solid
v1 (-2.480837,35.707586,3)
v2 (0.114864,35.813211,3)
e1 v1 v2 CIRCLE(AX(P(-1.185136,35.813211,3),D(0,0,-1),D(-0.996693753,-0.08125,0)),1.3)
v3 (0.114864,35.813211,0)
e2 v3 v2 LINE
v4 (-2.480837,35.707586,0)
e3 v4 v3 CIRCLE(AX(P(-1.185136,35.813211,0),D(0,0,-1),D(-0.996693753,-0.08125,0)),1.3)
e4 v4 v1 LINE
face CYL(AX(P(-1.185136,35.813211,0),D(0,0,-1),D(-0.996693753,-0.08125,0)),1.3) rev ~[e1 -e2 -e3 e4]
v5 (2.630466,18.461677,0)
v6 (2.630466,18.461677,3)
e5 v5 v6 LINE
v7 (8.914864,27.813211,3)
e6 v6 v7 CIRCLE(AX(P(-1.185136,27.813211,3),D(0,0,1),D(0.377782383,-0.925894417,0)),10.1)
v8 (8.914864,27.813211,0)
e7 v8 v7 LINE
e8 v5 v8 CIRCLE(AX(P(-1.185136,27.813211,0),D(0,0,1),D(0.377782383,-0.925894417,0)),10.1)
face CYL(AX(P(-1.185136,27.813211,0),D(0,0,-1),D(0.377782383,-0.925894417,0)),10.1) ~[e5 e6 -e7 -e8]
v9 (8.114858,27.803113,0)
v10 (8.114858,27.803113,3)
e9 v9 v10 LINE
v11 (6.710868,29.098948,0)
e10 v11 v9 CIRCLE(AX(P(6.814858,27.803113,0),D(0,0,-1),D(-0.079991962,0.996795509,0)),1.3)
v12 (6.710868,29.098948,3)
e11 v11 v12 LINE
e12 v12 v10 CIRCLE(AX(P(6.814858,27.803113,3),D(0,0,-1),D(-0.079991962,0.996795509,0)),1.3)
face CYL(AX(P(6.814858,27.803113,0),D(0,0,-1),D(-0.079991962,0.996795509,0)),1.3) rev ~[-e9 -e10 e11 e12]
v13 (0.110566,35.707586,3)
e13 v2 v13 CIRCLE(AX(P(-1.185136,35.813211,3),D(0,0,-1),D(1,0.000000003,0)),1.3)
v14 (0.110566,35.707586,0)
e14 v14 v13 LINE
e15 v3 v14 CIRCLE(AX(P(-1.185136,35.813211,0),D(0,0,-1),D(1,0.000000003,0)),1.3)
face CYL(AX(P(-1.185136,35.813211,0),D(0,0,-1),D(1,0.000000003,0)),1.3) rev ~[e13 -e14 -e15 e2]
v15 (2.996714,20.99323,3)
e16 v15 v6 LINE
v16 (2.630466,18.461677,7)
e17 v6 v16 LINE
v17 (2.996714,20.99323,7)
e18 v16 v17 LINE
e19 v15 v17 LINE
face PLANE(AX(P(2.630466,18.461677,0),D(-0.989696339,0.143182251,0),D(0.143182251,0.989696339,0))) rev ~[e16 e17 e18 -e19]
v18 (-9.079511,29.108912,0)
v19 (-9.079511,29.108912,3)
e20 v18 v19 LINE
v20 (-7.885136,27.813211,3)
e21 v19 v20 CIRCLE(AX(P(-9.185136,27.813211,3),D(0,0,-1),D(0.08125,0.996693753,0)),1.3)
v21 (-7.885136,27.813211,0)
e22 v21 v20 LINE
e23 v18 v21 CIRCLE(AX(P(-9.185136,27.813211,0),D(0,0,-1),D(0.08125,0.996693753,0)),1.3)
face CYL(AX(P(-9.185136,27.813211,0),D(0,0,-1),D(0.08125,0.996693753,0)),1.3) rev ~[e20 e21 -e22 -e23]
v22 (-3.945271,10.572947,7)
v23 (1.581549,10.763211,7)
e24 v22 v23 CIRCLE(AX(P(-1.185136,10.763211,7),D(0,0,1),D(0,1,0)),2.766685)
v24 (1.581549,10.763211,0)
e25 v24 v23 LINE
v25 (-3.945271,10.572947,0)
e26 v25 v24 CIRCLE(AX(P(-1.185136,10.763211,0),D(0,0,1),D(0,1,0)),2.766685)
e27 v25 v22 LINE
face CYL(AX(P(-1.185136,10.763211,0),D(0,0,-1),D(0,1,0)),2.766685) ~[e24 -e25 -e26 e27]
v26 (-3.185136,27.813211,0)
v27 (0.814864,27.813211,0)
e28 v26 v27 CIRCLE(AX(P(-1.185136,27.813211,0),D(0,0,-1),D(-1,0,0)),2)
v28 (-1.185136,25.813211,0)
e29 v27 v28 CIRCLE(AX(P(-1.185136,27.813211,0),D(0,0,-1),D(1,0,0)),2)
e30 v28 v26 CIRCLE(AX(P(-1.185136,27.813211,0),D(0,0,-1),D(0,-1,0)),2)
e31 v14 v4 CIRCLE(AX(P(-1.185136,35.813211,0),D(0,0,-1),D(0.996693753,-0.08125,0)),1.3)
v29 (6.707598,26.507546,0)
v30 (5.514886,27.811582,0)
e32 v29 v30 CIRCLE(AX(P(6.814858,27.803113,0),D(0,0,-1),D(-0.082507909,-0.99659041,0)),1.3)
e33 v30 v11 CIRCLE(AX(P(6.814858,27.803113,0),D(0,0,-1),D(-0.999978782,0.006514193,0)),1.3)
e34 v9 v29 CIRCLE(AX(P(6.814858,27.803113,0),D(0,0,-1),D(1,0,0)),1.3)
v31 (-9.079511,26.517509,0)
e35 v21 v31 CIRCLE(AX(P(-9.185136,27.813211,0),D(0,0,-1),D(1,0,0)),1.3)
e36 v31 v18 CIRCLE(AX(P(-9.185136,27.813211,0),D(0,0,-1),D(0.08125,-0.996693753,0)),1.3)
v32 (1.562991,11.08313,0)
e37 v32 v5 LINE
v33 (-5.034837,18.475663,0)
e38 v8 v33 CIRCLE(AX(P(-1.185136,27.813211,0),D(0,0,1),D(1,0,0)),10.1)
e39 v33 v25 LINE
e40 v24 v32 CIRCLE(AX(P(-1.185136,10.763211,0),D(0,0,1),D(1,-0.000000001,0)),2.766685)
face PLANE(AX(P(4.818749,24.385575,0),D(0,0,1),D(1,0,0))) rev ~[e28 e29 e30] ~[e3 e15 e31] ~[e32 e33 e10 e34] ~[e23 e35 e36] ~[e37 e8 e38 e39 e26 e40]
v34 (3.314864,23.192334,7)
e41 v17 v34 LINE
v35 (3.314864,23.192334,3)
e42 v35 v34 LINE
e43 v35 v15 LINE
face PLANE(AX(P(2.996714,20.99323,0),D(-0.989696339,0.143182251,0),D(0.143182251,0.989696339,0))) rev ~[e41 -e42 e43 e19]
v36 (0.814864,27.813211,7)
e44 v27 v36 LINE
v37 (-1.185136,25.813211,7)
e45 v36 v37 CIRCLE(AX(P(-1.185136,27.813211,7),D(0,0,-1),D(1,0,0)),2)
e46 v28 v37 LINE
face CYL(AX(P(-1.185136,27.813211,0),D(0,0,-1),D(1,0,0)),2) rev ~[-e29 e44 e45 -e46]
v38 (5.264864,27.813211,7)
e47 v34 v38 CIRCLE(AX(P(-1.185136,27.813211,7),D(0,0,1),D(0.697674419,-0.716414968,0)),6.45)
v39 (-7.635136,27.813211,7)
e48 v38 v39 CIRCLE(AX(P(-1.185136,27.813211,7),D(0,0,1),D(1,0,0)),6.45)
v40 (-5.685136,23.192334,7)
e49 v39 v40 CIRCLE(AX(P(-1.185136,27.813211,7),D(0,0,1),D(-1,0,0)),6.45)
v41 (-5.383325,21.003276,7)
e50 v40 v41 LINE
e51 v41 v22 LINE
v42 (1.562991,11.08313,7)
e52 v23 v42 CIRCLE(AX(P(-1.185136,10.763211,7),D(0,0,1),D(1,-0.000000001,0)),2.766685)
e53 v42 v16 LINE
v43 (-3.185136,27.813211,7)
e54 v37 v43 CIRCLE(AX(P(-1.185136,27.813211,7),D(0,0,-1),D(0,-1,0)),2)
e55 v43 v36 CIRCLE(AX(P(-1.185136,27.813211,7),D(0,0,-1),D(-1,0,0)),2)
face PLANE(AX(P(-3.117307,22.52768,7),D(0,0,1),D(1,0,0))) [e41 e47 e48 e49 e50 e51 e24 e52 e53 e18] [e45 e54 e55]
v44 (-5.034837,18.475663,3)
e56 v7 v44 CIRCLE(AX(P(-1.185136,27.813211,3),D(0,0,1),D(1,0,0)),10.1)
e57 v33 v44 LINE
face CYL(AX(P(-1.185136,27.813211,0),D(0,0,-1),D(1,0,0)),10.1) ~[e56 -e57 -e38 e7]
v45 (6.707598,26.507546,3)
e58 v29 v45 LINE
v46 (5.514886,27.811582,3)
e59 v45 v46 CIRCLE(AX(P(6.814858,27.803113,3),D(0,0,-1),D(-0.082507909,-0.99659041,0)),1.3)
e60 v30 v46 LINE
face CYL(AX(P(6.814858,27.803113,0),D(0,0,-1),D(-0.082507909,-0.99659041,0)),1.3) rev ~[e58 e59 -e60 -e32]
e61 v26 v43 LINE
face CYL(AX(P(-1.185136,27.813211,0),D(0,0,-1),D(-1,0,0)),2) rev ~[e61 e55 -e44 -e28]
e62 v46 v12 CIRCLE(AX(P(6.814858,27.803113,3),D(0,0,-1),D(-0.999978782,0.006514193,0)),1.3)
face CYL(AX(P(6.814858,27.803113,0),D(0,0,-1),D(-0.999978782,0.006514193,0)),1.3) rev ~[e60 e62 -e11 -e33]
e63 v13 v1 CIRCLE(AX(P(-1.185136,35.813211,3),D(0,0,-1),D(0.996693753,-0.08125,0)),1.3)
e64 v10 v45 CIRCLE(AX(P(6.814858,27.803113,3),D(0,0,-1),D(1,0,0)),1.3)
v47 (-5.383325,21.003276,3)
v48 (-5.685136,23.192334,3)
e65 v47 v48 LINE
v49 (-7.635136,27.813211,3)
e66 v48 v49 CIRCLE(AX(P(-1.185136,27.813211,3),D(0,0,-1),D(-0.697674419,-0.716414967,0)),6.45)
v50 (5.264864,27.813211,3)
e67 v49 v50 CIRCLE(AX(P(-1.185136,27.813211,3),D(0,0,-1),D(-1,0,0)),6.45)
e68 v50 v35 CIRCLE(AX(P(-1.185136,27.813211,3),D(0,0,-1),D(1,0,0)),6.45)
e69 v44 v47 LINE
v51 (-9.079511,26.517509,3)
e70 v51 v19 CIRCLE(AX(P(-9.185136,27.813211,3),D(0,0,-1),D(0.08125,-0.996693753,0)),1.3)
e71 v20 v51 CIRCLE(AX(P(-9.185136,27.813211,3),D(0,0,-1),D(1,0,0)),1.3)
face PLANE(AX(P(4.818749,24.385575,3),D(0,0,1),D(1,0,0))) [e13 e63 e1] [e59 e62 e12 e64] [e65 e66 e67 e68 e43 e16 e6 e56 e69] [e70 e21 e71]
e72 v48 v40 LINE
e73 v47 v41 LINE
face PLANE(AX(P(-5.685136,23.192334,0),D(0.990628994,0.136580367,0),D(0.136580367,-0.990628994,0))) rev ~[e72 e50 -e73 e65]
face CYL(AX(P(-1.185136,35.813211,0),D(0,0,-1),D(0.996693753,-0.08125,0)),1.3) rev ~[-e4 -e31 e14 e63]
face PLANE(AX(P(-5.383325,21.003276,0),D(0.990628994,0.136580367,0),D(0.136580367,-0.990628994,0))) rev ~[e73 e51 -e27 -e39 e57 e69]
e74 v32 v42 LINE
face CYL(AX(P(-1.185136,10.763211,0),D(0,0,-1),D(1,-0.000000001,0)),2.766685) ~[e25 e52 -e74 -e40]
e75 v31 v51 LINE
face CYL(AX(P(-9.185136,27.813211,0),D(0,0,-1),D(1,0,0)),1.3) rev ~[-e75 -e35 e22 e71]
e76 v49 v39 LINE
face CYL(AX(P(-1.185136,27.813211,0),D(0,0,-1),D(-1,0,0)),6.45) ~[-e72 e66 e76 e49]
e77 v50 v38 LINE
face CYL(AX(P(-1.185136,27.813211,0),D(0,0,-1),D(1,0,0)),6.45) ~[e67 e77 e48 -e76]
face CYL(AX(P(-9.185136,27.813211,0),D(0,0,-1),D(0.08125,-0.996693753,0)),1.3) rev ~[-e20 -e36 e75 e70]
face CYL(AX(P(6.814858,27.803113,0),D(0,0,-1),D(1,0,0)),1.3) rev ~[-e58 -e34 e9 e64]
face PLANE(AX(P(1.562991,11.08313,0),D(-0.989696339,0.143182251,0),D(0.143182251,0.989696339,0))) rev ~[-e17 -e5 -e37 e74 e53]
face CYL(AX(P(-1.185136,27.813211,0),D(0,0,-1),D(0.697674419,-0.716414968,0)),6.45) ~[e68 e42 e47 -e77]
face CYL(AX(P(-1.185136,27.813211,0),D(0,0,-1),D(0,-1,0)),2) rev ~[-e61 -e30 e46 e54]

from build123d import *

# Parameters (mm, degrees)
F1_DEPTH = 7
F2_DEPTH = 3
F3_DEPTH = 3


# Not quite as in the source:
# - a feature names something its author has since deleted; it is built from what else it names


with BuildPart() as f1:
    # F0 (on Top) → F1 (new body)
    with BuildSketch(Plane.XY):
        with BuildLine():
            Line((-1.1851356201, 23.1923339907), (-5.6851356201, 23.1923339907))
            ThreePointArc((-5.6851356201, 23.1923339907), (-3.6139055058, 21.83796352), (-1.1851356201, 21.3632105309))
            Line((-1.1851356201, 21.3632105309), (-1.1851356201, 23.1923339907))
        make_face()
        with BuildLine():
            ThreePointArc((-1.1851356201, 21.3632105309), (1.2436342657, 21.83796352), (3.3148643799, 23.1923339907))
            Line((3.3148643799, 23.1923339907), (-1.1851356201, 23.1923339907))
            Line((-1.1851356201, 23.1923339907), (-1.1851356201, 21.3632105309))
        make_face()
        with BuildLine():
            ThreePointArc((-7.6351356201, 27.8132105309), (-7.1276729569, 25.3054725063), (-5.6851356201, 23.1923339907))
            Line((-5.6851356201, 23.1923339907), (-1.1851356201, 23.1923339907))
            Line((-1.1851356201, 23.1923339907), (-1.1851356201, 25.8132105309))
            ThreePointArc((-1.1851356201, 25.8132105309), (-2.5993491824, 26.3989969686), (-3.1851356201, 27.8132105309))
            Line((-3.1851356201, 27.8132105309), (-7.6351356201, 27.8132105309))
        make_face()
        with BuildLine():
            Line((-1.1851356201, 23.1923339907), (3.3148643799, 23.1923339907))
            ThreePointArc((3.3148643799, 23.1923339907), (4.7574017168, 25.3054725063), (5.2648643799, 27.8132105309))
            Line((5.2648643799, 27.8132105309), (0.8148643799, 27.8132105309))
            ThreePointArc((0.8148643799, 27.8132105309), (0.2290779423, 26.3989969686), (-1.1851356201, 25.8132105309))
            Line((-1.1851356201, 25.8132105309), (-1.1851356201, 23.1923339907))
        make_face()
        with BuildLine():
            Line((-5.0348369716, 18.4756626995), (-3.9452707751, 10.572946599))
            ThreePointArc((-3.9452707751, 10.572946599), (-3.2076275018, 12.6510857986), (-1.1851356201, 13.5298956301))
            Line((-1.1851356201, 13.5298956301), (-1.1851356201, 17.7132105309))
            ThreePointArc((-1.18513562, 17.7132105309), (-3.1473750171, 17.9056570212), (-5.0348369716, 18.4756626995))
        make_face()
        with BuildLine():
            ThreePointArc((-3.9452707751, 10.572946599), (-1.0899472994, 7.9981634027), (1.5815494791, 10.7632105309))
            ThreePointArc((1.5815494791, 10.7632105309), (1.5769058667, 10.923439316), (1.562990617, 11.0831302441))
            ThreePointArc((1.562990617, 11.0831302441), (0.6546237847, 12.8295676566), (-1.1851356201, 13.5298956301))
            ThreePointArc((-1.1851356201, 13.5298956301), (-3.2076275018, 12.6510857986), (-3.9452707751, 10.572946599))
        make_face()
        with BuildLine():
            Line((-5.3833250343, 21.0032761963), (-5.0348369716, 18.4756626995))
            ThreePointArc((-5.0348369716, 18.4756626995), (-3.1473750171, 17.9056570212), (-1.18513562, 17.7132105309))
            Line((-1.1851356201, 17.7132105309), (-1.1851356201, 19.8132105309))
            ThreePointArc((-1.1851356201, 19.8132105309), (-3.3669382375, 20.1164750321), (-5.3833250343, 21.0032761963))
        make_face()
        with BuildLine():
            Line((-5.6851356201, 23.1923339907), (-5.3833250343, 21.0032761963))
            ThreePointArc((-5.3833250343, 21.0032761963), (-3.3669382375, 20.1164750321), (-1.1851356201, 19.8132105309))
            Line((-1.1851356201, 19.8132105309), (-1.1851356201, 21.3632105309))
            ThreePointArc((-1.1851356201, 21.3632105309), (-3.6139055058, 21.83796352), (-5.6851356201, 23.1923339907))
        make_face()
        with BuildLine():
            ThreePointArc((-1.1851356201, 13.5298956301), (0.6546237847, 12.8295676566), (1.562990617, 11.0831302441))
            Line((1.562990617, 11.0831302441), (2.630466448, 18.461676921))
            ThreePointArc((2.630466448, 18.461676921), (0.7590236506, 17.9020933018), (-1.18513562, 17.7132105309))
            Line((-1.1851356201, 17.7132105309), (-1.1851356201, 13.5298956301))
        make_face()
        with BuildLine():
            ThreePointArc((-1.18513562, 17.7132105309), (0.7590236506, 17.9020933018), (2.630466448, 18.461676921))
            Line((2.630466448, 18.461676921), (2.9967135721, 20.993229788))
            ThreePointArc((2.9967135721, 20.993229788), (0.9874382057, 20.1138649112), (-1.1851356201, 19.8132105309))
            Line((-1.1851356201, 19.8132105309), (-1.1851356201, 17.7132105309))
        make_face()
        with BuildLine():
            ThreePointArc((-1.1851356201, 19.8132105309), (0.9874382057, 20.1138649112), (2.9967135721, 20.993229788))
            Line((2.9967135721, 20.993229788), (3.3148643799, 23.1923339907))
            ThreePointArc((3.3148643799, 23.1923339907), (1.2436342657, 21.83796352), (-1.1851356201, 21.3632105309))
            Line((-1.1851356201, 21.3632105309), (-1.1851356201, 19.8132105309))
        make_face()
        with BuildLine():
            Line((0.8148643799, 27.8132105309), (5.2648643799, 27.8132105309))
            ThreePointArc((5.2648643799, 27.8132105309), (-1.1851356201, 34.2632105309), (-7.6351356201, 27.8132105309))
            Line((-7.6351356201, 27.8132105309), (-3.1851356201, 27.8132105309))
            ThreePointArc((-3.1851356201, 27.8132105309), (-1.1851356201, 29.8132105309), (0.8148643799, 27.8132105309))
        make_face()
    extrude(amount=F1_DEPTH)

    # F0 (on Top) → F2 (join)
    with BuildSketch(Plane.XY):
        with BuildLine():
            Line((2.9967135721, 20.993229788), (2.630466448, 18.461676921))
            ThreePointArc((2.630466448, 18.461676921), (7.1978107858, 22.179720533), (8.9148643799, 27.8132105309))
            ThreePointArc((8.9148643799, 27.8132105309), (-6.8033211078, 36.2064215866), (-5.0348369716, 18.4756626995))
            Line((-5.0348369716, 18.4756626995), (-5.3833250343, 21.0032761963))
            ThreePointArc((-5.3833250343, 21.0032761963), (-7.8303759033, 23.3589113068), (-9.0795106201, 26.5175086519))
            ThreePointArc((-9.0795106201, 26.5175086519), (-10.4851356201, 27.8132105309), (-9.0795106201, 29.10891241))
            ThreePointArc((-9.0795106201, 29.10891241), (-6.8419898695, 33.4700647804), (-2.4808374991, 35.7075855309))
            ThreePointArc((-2.4808374991, 35.7075855309), (-1.237991827, 37.1121355562), (0.1148643799, 35.8132105309))
            ThreePointArc((0.1148643799, 35.8132105309), (0.1137894053, 35.7603543239), (0.110566259, 35.7075855309))
            ThreePointArc((0.110566259, 35.7075855309), (4.4752873931, 33.4664937639), (6.7108684576, 29.0989475203))
            ThreePointArc((6.7108684576, 29.0989475203), (7.6965647575, 28.7584108036), (8.1148580079, 27.803113359))
            ThreePointArc((8.1148580079, 27.803113359), (7.6953583299, 26.8467038322), (6.7075977264, 26.5075458262))
            ThreePointArc((6.7075977264, 26.5075458262), (5.4519425182, 23.3467584953), (2.9967135721, 20.993229788))
        make_face()
        with BuildLine():
            ThreePointArc((-9.0795106201, 26.5175086519), (-7.8303759033, 23.3589113068), (-5.3833250343, 21.0032761963))
            Line((-5.3833250343, 21.0032761963), (-5.6851356201, 23.1923339907))
            ThreePointArc((-5.6851356201, 23.1923339907), (-7.1276729569, 25.3054725063), (-7.6351356201, 27.8132105309))
            Line((-7.6351356201, 27.8132105309), (-7.8851356201, 27.8132105309))
            ThreePointArc((-7.8851356201, 27.8132105309), (-8.229281944, 26.9321068197), (-9.0795106201, 26.5175086519))
        make_face()
    extrude(amount=F2_DEPTH)

    # F0 (on Top) → F3 (join)
    with BuildSketch(Plane.XY):
        with BuildLine():
            Line((3.3148643799, 23.1923339907), (2.9967135721, 20.993229788))
            ThreePointArc((2.9967135721, 20.993229788), (5.4519425182, 23.3467584953), (6.7075977264, 26.5075458262))
            ThreePointArc((6.7075977264, 26.5075458262), (5.8555856645, 26.9257328422), (5.5148855907, 27.81158181))
            Line((5.5148855907, 27.81158181), (5.2648643799, 27.8132105309))
            ThreePointArc((5.2648643799, 27.8132105309), (4.7574017168, 25.3054725063), (3.3148643799, 23.1923339907))
        make_face()
        with BuildLine():
            ThreePointArc((-7.6351356201, 27.8132105309), (-1.1851356201, 34.2632105309), (5.2648643799, 27.8132105309))
            Line((5.2648643799, 27.8132105309), (5.5148855907, 27.81158181))
            ThreePointArc((5.5148855907, 27.81158181), (5.8624374498, 28.6879269442), (6.7108684576, 29.0989475203))
            ThreePointArc((6.7108684576, 29.0989475203), (4.4752873931, 33.4664937639), (0.110566259, 35.7075855309))
            ThreePointArc((0.110566259, 35.7075855309), (-1.1851356201, 34.5132105309), (-2.4808374991, 35.7075855309))
            ThreePointArc((-2.4808374991, 35.7075855309), (-6.8419898695, 33.4700647804), (-9.0795106201, 29.10891241))
            ThreePointArc((-9.0795106201, 29.10891241), (-8.229281944, 28.6943142422), (-7.8851356201, 27.8132105309))
            Line((-7.8851356201, 27.8132105309), (-7.6351356201, 27.8132105309))
        make_face()
    extrude(amount=F3_DEPTH)


solid = f1.part
